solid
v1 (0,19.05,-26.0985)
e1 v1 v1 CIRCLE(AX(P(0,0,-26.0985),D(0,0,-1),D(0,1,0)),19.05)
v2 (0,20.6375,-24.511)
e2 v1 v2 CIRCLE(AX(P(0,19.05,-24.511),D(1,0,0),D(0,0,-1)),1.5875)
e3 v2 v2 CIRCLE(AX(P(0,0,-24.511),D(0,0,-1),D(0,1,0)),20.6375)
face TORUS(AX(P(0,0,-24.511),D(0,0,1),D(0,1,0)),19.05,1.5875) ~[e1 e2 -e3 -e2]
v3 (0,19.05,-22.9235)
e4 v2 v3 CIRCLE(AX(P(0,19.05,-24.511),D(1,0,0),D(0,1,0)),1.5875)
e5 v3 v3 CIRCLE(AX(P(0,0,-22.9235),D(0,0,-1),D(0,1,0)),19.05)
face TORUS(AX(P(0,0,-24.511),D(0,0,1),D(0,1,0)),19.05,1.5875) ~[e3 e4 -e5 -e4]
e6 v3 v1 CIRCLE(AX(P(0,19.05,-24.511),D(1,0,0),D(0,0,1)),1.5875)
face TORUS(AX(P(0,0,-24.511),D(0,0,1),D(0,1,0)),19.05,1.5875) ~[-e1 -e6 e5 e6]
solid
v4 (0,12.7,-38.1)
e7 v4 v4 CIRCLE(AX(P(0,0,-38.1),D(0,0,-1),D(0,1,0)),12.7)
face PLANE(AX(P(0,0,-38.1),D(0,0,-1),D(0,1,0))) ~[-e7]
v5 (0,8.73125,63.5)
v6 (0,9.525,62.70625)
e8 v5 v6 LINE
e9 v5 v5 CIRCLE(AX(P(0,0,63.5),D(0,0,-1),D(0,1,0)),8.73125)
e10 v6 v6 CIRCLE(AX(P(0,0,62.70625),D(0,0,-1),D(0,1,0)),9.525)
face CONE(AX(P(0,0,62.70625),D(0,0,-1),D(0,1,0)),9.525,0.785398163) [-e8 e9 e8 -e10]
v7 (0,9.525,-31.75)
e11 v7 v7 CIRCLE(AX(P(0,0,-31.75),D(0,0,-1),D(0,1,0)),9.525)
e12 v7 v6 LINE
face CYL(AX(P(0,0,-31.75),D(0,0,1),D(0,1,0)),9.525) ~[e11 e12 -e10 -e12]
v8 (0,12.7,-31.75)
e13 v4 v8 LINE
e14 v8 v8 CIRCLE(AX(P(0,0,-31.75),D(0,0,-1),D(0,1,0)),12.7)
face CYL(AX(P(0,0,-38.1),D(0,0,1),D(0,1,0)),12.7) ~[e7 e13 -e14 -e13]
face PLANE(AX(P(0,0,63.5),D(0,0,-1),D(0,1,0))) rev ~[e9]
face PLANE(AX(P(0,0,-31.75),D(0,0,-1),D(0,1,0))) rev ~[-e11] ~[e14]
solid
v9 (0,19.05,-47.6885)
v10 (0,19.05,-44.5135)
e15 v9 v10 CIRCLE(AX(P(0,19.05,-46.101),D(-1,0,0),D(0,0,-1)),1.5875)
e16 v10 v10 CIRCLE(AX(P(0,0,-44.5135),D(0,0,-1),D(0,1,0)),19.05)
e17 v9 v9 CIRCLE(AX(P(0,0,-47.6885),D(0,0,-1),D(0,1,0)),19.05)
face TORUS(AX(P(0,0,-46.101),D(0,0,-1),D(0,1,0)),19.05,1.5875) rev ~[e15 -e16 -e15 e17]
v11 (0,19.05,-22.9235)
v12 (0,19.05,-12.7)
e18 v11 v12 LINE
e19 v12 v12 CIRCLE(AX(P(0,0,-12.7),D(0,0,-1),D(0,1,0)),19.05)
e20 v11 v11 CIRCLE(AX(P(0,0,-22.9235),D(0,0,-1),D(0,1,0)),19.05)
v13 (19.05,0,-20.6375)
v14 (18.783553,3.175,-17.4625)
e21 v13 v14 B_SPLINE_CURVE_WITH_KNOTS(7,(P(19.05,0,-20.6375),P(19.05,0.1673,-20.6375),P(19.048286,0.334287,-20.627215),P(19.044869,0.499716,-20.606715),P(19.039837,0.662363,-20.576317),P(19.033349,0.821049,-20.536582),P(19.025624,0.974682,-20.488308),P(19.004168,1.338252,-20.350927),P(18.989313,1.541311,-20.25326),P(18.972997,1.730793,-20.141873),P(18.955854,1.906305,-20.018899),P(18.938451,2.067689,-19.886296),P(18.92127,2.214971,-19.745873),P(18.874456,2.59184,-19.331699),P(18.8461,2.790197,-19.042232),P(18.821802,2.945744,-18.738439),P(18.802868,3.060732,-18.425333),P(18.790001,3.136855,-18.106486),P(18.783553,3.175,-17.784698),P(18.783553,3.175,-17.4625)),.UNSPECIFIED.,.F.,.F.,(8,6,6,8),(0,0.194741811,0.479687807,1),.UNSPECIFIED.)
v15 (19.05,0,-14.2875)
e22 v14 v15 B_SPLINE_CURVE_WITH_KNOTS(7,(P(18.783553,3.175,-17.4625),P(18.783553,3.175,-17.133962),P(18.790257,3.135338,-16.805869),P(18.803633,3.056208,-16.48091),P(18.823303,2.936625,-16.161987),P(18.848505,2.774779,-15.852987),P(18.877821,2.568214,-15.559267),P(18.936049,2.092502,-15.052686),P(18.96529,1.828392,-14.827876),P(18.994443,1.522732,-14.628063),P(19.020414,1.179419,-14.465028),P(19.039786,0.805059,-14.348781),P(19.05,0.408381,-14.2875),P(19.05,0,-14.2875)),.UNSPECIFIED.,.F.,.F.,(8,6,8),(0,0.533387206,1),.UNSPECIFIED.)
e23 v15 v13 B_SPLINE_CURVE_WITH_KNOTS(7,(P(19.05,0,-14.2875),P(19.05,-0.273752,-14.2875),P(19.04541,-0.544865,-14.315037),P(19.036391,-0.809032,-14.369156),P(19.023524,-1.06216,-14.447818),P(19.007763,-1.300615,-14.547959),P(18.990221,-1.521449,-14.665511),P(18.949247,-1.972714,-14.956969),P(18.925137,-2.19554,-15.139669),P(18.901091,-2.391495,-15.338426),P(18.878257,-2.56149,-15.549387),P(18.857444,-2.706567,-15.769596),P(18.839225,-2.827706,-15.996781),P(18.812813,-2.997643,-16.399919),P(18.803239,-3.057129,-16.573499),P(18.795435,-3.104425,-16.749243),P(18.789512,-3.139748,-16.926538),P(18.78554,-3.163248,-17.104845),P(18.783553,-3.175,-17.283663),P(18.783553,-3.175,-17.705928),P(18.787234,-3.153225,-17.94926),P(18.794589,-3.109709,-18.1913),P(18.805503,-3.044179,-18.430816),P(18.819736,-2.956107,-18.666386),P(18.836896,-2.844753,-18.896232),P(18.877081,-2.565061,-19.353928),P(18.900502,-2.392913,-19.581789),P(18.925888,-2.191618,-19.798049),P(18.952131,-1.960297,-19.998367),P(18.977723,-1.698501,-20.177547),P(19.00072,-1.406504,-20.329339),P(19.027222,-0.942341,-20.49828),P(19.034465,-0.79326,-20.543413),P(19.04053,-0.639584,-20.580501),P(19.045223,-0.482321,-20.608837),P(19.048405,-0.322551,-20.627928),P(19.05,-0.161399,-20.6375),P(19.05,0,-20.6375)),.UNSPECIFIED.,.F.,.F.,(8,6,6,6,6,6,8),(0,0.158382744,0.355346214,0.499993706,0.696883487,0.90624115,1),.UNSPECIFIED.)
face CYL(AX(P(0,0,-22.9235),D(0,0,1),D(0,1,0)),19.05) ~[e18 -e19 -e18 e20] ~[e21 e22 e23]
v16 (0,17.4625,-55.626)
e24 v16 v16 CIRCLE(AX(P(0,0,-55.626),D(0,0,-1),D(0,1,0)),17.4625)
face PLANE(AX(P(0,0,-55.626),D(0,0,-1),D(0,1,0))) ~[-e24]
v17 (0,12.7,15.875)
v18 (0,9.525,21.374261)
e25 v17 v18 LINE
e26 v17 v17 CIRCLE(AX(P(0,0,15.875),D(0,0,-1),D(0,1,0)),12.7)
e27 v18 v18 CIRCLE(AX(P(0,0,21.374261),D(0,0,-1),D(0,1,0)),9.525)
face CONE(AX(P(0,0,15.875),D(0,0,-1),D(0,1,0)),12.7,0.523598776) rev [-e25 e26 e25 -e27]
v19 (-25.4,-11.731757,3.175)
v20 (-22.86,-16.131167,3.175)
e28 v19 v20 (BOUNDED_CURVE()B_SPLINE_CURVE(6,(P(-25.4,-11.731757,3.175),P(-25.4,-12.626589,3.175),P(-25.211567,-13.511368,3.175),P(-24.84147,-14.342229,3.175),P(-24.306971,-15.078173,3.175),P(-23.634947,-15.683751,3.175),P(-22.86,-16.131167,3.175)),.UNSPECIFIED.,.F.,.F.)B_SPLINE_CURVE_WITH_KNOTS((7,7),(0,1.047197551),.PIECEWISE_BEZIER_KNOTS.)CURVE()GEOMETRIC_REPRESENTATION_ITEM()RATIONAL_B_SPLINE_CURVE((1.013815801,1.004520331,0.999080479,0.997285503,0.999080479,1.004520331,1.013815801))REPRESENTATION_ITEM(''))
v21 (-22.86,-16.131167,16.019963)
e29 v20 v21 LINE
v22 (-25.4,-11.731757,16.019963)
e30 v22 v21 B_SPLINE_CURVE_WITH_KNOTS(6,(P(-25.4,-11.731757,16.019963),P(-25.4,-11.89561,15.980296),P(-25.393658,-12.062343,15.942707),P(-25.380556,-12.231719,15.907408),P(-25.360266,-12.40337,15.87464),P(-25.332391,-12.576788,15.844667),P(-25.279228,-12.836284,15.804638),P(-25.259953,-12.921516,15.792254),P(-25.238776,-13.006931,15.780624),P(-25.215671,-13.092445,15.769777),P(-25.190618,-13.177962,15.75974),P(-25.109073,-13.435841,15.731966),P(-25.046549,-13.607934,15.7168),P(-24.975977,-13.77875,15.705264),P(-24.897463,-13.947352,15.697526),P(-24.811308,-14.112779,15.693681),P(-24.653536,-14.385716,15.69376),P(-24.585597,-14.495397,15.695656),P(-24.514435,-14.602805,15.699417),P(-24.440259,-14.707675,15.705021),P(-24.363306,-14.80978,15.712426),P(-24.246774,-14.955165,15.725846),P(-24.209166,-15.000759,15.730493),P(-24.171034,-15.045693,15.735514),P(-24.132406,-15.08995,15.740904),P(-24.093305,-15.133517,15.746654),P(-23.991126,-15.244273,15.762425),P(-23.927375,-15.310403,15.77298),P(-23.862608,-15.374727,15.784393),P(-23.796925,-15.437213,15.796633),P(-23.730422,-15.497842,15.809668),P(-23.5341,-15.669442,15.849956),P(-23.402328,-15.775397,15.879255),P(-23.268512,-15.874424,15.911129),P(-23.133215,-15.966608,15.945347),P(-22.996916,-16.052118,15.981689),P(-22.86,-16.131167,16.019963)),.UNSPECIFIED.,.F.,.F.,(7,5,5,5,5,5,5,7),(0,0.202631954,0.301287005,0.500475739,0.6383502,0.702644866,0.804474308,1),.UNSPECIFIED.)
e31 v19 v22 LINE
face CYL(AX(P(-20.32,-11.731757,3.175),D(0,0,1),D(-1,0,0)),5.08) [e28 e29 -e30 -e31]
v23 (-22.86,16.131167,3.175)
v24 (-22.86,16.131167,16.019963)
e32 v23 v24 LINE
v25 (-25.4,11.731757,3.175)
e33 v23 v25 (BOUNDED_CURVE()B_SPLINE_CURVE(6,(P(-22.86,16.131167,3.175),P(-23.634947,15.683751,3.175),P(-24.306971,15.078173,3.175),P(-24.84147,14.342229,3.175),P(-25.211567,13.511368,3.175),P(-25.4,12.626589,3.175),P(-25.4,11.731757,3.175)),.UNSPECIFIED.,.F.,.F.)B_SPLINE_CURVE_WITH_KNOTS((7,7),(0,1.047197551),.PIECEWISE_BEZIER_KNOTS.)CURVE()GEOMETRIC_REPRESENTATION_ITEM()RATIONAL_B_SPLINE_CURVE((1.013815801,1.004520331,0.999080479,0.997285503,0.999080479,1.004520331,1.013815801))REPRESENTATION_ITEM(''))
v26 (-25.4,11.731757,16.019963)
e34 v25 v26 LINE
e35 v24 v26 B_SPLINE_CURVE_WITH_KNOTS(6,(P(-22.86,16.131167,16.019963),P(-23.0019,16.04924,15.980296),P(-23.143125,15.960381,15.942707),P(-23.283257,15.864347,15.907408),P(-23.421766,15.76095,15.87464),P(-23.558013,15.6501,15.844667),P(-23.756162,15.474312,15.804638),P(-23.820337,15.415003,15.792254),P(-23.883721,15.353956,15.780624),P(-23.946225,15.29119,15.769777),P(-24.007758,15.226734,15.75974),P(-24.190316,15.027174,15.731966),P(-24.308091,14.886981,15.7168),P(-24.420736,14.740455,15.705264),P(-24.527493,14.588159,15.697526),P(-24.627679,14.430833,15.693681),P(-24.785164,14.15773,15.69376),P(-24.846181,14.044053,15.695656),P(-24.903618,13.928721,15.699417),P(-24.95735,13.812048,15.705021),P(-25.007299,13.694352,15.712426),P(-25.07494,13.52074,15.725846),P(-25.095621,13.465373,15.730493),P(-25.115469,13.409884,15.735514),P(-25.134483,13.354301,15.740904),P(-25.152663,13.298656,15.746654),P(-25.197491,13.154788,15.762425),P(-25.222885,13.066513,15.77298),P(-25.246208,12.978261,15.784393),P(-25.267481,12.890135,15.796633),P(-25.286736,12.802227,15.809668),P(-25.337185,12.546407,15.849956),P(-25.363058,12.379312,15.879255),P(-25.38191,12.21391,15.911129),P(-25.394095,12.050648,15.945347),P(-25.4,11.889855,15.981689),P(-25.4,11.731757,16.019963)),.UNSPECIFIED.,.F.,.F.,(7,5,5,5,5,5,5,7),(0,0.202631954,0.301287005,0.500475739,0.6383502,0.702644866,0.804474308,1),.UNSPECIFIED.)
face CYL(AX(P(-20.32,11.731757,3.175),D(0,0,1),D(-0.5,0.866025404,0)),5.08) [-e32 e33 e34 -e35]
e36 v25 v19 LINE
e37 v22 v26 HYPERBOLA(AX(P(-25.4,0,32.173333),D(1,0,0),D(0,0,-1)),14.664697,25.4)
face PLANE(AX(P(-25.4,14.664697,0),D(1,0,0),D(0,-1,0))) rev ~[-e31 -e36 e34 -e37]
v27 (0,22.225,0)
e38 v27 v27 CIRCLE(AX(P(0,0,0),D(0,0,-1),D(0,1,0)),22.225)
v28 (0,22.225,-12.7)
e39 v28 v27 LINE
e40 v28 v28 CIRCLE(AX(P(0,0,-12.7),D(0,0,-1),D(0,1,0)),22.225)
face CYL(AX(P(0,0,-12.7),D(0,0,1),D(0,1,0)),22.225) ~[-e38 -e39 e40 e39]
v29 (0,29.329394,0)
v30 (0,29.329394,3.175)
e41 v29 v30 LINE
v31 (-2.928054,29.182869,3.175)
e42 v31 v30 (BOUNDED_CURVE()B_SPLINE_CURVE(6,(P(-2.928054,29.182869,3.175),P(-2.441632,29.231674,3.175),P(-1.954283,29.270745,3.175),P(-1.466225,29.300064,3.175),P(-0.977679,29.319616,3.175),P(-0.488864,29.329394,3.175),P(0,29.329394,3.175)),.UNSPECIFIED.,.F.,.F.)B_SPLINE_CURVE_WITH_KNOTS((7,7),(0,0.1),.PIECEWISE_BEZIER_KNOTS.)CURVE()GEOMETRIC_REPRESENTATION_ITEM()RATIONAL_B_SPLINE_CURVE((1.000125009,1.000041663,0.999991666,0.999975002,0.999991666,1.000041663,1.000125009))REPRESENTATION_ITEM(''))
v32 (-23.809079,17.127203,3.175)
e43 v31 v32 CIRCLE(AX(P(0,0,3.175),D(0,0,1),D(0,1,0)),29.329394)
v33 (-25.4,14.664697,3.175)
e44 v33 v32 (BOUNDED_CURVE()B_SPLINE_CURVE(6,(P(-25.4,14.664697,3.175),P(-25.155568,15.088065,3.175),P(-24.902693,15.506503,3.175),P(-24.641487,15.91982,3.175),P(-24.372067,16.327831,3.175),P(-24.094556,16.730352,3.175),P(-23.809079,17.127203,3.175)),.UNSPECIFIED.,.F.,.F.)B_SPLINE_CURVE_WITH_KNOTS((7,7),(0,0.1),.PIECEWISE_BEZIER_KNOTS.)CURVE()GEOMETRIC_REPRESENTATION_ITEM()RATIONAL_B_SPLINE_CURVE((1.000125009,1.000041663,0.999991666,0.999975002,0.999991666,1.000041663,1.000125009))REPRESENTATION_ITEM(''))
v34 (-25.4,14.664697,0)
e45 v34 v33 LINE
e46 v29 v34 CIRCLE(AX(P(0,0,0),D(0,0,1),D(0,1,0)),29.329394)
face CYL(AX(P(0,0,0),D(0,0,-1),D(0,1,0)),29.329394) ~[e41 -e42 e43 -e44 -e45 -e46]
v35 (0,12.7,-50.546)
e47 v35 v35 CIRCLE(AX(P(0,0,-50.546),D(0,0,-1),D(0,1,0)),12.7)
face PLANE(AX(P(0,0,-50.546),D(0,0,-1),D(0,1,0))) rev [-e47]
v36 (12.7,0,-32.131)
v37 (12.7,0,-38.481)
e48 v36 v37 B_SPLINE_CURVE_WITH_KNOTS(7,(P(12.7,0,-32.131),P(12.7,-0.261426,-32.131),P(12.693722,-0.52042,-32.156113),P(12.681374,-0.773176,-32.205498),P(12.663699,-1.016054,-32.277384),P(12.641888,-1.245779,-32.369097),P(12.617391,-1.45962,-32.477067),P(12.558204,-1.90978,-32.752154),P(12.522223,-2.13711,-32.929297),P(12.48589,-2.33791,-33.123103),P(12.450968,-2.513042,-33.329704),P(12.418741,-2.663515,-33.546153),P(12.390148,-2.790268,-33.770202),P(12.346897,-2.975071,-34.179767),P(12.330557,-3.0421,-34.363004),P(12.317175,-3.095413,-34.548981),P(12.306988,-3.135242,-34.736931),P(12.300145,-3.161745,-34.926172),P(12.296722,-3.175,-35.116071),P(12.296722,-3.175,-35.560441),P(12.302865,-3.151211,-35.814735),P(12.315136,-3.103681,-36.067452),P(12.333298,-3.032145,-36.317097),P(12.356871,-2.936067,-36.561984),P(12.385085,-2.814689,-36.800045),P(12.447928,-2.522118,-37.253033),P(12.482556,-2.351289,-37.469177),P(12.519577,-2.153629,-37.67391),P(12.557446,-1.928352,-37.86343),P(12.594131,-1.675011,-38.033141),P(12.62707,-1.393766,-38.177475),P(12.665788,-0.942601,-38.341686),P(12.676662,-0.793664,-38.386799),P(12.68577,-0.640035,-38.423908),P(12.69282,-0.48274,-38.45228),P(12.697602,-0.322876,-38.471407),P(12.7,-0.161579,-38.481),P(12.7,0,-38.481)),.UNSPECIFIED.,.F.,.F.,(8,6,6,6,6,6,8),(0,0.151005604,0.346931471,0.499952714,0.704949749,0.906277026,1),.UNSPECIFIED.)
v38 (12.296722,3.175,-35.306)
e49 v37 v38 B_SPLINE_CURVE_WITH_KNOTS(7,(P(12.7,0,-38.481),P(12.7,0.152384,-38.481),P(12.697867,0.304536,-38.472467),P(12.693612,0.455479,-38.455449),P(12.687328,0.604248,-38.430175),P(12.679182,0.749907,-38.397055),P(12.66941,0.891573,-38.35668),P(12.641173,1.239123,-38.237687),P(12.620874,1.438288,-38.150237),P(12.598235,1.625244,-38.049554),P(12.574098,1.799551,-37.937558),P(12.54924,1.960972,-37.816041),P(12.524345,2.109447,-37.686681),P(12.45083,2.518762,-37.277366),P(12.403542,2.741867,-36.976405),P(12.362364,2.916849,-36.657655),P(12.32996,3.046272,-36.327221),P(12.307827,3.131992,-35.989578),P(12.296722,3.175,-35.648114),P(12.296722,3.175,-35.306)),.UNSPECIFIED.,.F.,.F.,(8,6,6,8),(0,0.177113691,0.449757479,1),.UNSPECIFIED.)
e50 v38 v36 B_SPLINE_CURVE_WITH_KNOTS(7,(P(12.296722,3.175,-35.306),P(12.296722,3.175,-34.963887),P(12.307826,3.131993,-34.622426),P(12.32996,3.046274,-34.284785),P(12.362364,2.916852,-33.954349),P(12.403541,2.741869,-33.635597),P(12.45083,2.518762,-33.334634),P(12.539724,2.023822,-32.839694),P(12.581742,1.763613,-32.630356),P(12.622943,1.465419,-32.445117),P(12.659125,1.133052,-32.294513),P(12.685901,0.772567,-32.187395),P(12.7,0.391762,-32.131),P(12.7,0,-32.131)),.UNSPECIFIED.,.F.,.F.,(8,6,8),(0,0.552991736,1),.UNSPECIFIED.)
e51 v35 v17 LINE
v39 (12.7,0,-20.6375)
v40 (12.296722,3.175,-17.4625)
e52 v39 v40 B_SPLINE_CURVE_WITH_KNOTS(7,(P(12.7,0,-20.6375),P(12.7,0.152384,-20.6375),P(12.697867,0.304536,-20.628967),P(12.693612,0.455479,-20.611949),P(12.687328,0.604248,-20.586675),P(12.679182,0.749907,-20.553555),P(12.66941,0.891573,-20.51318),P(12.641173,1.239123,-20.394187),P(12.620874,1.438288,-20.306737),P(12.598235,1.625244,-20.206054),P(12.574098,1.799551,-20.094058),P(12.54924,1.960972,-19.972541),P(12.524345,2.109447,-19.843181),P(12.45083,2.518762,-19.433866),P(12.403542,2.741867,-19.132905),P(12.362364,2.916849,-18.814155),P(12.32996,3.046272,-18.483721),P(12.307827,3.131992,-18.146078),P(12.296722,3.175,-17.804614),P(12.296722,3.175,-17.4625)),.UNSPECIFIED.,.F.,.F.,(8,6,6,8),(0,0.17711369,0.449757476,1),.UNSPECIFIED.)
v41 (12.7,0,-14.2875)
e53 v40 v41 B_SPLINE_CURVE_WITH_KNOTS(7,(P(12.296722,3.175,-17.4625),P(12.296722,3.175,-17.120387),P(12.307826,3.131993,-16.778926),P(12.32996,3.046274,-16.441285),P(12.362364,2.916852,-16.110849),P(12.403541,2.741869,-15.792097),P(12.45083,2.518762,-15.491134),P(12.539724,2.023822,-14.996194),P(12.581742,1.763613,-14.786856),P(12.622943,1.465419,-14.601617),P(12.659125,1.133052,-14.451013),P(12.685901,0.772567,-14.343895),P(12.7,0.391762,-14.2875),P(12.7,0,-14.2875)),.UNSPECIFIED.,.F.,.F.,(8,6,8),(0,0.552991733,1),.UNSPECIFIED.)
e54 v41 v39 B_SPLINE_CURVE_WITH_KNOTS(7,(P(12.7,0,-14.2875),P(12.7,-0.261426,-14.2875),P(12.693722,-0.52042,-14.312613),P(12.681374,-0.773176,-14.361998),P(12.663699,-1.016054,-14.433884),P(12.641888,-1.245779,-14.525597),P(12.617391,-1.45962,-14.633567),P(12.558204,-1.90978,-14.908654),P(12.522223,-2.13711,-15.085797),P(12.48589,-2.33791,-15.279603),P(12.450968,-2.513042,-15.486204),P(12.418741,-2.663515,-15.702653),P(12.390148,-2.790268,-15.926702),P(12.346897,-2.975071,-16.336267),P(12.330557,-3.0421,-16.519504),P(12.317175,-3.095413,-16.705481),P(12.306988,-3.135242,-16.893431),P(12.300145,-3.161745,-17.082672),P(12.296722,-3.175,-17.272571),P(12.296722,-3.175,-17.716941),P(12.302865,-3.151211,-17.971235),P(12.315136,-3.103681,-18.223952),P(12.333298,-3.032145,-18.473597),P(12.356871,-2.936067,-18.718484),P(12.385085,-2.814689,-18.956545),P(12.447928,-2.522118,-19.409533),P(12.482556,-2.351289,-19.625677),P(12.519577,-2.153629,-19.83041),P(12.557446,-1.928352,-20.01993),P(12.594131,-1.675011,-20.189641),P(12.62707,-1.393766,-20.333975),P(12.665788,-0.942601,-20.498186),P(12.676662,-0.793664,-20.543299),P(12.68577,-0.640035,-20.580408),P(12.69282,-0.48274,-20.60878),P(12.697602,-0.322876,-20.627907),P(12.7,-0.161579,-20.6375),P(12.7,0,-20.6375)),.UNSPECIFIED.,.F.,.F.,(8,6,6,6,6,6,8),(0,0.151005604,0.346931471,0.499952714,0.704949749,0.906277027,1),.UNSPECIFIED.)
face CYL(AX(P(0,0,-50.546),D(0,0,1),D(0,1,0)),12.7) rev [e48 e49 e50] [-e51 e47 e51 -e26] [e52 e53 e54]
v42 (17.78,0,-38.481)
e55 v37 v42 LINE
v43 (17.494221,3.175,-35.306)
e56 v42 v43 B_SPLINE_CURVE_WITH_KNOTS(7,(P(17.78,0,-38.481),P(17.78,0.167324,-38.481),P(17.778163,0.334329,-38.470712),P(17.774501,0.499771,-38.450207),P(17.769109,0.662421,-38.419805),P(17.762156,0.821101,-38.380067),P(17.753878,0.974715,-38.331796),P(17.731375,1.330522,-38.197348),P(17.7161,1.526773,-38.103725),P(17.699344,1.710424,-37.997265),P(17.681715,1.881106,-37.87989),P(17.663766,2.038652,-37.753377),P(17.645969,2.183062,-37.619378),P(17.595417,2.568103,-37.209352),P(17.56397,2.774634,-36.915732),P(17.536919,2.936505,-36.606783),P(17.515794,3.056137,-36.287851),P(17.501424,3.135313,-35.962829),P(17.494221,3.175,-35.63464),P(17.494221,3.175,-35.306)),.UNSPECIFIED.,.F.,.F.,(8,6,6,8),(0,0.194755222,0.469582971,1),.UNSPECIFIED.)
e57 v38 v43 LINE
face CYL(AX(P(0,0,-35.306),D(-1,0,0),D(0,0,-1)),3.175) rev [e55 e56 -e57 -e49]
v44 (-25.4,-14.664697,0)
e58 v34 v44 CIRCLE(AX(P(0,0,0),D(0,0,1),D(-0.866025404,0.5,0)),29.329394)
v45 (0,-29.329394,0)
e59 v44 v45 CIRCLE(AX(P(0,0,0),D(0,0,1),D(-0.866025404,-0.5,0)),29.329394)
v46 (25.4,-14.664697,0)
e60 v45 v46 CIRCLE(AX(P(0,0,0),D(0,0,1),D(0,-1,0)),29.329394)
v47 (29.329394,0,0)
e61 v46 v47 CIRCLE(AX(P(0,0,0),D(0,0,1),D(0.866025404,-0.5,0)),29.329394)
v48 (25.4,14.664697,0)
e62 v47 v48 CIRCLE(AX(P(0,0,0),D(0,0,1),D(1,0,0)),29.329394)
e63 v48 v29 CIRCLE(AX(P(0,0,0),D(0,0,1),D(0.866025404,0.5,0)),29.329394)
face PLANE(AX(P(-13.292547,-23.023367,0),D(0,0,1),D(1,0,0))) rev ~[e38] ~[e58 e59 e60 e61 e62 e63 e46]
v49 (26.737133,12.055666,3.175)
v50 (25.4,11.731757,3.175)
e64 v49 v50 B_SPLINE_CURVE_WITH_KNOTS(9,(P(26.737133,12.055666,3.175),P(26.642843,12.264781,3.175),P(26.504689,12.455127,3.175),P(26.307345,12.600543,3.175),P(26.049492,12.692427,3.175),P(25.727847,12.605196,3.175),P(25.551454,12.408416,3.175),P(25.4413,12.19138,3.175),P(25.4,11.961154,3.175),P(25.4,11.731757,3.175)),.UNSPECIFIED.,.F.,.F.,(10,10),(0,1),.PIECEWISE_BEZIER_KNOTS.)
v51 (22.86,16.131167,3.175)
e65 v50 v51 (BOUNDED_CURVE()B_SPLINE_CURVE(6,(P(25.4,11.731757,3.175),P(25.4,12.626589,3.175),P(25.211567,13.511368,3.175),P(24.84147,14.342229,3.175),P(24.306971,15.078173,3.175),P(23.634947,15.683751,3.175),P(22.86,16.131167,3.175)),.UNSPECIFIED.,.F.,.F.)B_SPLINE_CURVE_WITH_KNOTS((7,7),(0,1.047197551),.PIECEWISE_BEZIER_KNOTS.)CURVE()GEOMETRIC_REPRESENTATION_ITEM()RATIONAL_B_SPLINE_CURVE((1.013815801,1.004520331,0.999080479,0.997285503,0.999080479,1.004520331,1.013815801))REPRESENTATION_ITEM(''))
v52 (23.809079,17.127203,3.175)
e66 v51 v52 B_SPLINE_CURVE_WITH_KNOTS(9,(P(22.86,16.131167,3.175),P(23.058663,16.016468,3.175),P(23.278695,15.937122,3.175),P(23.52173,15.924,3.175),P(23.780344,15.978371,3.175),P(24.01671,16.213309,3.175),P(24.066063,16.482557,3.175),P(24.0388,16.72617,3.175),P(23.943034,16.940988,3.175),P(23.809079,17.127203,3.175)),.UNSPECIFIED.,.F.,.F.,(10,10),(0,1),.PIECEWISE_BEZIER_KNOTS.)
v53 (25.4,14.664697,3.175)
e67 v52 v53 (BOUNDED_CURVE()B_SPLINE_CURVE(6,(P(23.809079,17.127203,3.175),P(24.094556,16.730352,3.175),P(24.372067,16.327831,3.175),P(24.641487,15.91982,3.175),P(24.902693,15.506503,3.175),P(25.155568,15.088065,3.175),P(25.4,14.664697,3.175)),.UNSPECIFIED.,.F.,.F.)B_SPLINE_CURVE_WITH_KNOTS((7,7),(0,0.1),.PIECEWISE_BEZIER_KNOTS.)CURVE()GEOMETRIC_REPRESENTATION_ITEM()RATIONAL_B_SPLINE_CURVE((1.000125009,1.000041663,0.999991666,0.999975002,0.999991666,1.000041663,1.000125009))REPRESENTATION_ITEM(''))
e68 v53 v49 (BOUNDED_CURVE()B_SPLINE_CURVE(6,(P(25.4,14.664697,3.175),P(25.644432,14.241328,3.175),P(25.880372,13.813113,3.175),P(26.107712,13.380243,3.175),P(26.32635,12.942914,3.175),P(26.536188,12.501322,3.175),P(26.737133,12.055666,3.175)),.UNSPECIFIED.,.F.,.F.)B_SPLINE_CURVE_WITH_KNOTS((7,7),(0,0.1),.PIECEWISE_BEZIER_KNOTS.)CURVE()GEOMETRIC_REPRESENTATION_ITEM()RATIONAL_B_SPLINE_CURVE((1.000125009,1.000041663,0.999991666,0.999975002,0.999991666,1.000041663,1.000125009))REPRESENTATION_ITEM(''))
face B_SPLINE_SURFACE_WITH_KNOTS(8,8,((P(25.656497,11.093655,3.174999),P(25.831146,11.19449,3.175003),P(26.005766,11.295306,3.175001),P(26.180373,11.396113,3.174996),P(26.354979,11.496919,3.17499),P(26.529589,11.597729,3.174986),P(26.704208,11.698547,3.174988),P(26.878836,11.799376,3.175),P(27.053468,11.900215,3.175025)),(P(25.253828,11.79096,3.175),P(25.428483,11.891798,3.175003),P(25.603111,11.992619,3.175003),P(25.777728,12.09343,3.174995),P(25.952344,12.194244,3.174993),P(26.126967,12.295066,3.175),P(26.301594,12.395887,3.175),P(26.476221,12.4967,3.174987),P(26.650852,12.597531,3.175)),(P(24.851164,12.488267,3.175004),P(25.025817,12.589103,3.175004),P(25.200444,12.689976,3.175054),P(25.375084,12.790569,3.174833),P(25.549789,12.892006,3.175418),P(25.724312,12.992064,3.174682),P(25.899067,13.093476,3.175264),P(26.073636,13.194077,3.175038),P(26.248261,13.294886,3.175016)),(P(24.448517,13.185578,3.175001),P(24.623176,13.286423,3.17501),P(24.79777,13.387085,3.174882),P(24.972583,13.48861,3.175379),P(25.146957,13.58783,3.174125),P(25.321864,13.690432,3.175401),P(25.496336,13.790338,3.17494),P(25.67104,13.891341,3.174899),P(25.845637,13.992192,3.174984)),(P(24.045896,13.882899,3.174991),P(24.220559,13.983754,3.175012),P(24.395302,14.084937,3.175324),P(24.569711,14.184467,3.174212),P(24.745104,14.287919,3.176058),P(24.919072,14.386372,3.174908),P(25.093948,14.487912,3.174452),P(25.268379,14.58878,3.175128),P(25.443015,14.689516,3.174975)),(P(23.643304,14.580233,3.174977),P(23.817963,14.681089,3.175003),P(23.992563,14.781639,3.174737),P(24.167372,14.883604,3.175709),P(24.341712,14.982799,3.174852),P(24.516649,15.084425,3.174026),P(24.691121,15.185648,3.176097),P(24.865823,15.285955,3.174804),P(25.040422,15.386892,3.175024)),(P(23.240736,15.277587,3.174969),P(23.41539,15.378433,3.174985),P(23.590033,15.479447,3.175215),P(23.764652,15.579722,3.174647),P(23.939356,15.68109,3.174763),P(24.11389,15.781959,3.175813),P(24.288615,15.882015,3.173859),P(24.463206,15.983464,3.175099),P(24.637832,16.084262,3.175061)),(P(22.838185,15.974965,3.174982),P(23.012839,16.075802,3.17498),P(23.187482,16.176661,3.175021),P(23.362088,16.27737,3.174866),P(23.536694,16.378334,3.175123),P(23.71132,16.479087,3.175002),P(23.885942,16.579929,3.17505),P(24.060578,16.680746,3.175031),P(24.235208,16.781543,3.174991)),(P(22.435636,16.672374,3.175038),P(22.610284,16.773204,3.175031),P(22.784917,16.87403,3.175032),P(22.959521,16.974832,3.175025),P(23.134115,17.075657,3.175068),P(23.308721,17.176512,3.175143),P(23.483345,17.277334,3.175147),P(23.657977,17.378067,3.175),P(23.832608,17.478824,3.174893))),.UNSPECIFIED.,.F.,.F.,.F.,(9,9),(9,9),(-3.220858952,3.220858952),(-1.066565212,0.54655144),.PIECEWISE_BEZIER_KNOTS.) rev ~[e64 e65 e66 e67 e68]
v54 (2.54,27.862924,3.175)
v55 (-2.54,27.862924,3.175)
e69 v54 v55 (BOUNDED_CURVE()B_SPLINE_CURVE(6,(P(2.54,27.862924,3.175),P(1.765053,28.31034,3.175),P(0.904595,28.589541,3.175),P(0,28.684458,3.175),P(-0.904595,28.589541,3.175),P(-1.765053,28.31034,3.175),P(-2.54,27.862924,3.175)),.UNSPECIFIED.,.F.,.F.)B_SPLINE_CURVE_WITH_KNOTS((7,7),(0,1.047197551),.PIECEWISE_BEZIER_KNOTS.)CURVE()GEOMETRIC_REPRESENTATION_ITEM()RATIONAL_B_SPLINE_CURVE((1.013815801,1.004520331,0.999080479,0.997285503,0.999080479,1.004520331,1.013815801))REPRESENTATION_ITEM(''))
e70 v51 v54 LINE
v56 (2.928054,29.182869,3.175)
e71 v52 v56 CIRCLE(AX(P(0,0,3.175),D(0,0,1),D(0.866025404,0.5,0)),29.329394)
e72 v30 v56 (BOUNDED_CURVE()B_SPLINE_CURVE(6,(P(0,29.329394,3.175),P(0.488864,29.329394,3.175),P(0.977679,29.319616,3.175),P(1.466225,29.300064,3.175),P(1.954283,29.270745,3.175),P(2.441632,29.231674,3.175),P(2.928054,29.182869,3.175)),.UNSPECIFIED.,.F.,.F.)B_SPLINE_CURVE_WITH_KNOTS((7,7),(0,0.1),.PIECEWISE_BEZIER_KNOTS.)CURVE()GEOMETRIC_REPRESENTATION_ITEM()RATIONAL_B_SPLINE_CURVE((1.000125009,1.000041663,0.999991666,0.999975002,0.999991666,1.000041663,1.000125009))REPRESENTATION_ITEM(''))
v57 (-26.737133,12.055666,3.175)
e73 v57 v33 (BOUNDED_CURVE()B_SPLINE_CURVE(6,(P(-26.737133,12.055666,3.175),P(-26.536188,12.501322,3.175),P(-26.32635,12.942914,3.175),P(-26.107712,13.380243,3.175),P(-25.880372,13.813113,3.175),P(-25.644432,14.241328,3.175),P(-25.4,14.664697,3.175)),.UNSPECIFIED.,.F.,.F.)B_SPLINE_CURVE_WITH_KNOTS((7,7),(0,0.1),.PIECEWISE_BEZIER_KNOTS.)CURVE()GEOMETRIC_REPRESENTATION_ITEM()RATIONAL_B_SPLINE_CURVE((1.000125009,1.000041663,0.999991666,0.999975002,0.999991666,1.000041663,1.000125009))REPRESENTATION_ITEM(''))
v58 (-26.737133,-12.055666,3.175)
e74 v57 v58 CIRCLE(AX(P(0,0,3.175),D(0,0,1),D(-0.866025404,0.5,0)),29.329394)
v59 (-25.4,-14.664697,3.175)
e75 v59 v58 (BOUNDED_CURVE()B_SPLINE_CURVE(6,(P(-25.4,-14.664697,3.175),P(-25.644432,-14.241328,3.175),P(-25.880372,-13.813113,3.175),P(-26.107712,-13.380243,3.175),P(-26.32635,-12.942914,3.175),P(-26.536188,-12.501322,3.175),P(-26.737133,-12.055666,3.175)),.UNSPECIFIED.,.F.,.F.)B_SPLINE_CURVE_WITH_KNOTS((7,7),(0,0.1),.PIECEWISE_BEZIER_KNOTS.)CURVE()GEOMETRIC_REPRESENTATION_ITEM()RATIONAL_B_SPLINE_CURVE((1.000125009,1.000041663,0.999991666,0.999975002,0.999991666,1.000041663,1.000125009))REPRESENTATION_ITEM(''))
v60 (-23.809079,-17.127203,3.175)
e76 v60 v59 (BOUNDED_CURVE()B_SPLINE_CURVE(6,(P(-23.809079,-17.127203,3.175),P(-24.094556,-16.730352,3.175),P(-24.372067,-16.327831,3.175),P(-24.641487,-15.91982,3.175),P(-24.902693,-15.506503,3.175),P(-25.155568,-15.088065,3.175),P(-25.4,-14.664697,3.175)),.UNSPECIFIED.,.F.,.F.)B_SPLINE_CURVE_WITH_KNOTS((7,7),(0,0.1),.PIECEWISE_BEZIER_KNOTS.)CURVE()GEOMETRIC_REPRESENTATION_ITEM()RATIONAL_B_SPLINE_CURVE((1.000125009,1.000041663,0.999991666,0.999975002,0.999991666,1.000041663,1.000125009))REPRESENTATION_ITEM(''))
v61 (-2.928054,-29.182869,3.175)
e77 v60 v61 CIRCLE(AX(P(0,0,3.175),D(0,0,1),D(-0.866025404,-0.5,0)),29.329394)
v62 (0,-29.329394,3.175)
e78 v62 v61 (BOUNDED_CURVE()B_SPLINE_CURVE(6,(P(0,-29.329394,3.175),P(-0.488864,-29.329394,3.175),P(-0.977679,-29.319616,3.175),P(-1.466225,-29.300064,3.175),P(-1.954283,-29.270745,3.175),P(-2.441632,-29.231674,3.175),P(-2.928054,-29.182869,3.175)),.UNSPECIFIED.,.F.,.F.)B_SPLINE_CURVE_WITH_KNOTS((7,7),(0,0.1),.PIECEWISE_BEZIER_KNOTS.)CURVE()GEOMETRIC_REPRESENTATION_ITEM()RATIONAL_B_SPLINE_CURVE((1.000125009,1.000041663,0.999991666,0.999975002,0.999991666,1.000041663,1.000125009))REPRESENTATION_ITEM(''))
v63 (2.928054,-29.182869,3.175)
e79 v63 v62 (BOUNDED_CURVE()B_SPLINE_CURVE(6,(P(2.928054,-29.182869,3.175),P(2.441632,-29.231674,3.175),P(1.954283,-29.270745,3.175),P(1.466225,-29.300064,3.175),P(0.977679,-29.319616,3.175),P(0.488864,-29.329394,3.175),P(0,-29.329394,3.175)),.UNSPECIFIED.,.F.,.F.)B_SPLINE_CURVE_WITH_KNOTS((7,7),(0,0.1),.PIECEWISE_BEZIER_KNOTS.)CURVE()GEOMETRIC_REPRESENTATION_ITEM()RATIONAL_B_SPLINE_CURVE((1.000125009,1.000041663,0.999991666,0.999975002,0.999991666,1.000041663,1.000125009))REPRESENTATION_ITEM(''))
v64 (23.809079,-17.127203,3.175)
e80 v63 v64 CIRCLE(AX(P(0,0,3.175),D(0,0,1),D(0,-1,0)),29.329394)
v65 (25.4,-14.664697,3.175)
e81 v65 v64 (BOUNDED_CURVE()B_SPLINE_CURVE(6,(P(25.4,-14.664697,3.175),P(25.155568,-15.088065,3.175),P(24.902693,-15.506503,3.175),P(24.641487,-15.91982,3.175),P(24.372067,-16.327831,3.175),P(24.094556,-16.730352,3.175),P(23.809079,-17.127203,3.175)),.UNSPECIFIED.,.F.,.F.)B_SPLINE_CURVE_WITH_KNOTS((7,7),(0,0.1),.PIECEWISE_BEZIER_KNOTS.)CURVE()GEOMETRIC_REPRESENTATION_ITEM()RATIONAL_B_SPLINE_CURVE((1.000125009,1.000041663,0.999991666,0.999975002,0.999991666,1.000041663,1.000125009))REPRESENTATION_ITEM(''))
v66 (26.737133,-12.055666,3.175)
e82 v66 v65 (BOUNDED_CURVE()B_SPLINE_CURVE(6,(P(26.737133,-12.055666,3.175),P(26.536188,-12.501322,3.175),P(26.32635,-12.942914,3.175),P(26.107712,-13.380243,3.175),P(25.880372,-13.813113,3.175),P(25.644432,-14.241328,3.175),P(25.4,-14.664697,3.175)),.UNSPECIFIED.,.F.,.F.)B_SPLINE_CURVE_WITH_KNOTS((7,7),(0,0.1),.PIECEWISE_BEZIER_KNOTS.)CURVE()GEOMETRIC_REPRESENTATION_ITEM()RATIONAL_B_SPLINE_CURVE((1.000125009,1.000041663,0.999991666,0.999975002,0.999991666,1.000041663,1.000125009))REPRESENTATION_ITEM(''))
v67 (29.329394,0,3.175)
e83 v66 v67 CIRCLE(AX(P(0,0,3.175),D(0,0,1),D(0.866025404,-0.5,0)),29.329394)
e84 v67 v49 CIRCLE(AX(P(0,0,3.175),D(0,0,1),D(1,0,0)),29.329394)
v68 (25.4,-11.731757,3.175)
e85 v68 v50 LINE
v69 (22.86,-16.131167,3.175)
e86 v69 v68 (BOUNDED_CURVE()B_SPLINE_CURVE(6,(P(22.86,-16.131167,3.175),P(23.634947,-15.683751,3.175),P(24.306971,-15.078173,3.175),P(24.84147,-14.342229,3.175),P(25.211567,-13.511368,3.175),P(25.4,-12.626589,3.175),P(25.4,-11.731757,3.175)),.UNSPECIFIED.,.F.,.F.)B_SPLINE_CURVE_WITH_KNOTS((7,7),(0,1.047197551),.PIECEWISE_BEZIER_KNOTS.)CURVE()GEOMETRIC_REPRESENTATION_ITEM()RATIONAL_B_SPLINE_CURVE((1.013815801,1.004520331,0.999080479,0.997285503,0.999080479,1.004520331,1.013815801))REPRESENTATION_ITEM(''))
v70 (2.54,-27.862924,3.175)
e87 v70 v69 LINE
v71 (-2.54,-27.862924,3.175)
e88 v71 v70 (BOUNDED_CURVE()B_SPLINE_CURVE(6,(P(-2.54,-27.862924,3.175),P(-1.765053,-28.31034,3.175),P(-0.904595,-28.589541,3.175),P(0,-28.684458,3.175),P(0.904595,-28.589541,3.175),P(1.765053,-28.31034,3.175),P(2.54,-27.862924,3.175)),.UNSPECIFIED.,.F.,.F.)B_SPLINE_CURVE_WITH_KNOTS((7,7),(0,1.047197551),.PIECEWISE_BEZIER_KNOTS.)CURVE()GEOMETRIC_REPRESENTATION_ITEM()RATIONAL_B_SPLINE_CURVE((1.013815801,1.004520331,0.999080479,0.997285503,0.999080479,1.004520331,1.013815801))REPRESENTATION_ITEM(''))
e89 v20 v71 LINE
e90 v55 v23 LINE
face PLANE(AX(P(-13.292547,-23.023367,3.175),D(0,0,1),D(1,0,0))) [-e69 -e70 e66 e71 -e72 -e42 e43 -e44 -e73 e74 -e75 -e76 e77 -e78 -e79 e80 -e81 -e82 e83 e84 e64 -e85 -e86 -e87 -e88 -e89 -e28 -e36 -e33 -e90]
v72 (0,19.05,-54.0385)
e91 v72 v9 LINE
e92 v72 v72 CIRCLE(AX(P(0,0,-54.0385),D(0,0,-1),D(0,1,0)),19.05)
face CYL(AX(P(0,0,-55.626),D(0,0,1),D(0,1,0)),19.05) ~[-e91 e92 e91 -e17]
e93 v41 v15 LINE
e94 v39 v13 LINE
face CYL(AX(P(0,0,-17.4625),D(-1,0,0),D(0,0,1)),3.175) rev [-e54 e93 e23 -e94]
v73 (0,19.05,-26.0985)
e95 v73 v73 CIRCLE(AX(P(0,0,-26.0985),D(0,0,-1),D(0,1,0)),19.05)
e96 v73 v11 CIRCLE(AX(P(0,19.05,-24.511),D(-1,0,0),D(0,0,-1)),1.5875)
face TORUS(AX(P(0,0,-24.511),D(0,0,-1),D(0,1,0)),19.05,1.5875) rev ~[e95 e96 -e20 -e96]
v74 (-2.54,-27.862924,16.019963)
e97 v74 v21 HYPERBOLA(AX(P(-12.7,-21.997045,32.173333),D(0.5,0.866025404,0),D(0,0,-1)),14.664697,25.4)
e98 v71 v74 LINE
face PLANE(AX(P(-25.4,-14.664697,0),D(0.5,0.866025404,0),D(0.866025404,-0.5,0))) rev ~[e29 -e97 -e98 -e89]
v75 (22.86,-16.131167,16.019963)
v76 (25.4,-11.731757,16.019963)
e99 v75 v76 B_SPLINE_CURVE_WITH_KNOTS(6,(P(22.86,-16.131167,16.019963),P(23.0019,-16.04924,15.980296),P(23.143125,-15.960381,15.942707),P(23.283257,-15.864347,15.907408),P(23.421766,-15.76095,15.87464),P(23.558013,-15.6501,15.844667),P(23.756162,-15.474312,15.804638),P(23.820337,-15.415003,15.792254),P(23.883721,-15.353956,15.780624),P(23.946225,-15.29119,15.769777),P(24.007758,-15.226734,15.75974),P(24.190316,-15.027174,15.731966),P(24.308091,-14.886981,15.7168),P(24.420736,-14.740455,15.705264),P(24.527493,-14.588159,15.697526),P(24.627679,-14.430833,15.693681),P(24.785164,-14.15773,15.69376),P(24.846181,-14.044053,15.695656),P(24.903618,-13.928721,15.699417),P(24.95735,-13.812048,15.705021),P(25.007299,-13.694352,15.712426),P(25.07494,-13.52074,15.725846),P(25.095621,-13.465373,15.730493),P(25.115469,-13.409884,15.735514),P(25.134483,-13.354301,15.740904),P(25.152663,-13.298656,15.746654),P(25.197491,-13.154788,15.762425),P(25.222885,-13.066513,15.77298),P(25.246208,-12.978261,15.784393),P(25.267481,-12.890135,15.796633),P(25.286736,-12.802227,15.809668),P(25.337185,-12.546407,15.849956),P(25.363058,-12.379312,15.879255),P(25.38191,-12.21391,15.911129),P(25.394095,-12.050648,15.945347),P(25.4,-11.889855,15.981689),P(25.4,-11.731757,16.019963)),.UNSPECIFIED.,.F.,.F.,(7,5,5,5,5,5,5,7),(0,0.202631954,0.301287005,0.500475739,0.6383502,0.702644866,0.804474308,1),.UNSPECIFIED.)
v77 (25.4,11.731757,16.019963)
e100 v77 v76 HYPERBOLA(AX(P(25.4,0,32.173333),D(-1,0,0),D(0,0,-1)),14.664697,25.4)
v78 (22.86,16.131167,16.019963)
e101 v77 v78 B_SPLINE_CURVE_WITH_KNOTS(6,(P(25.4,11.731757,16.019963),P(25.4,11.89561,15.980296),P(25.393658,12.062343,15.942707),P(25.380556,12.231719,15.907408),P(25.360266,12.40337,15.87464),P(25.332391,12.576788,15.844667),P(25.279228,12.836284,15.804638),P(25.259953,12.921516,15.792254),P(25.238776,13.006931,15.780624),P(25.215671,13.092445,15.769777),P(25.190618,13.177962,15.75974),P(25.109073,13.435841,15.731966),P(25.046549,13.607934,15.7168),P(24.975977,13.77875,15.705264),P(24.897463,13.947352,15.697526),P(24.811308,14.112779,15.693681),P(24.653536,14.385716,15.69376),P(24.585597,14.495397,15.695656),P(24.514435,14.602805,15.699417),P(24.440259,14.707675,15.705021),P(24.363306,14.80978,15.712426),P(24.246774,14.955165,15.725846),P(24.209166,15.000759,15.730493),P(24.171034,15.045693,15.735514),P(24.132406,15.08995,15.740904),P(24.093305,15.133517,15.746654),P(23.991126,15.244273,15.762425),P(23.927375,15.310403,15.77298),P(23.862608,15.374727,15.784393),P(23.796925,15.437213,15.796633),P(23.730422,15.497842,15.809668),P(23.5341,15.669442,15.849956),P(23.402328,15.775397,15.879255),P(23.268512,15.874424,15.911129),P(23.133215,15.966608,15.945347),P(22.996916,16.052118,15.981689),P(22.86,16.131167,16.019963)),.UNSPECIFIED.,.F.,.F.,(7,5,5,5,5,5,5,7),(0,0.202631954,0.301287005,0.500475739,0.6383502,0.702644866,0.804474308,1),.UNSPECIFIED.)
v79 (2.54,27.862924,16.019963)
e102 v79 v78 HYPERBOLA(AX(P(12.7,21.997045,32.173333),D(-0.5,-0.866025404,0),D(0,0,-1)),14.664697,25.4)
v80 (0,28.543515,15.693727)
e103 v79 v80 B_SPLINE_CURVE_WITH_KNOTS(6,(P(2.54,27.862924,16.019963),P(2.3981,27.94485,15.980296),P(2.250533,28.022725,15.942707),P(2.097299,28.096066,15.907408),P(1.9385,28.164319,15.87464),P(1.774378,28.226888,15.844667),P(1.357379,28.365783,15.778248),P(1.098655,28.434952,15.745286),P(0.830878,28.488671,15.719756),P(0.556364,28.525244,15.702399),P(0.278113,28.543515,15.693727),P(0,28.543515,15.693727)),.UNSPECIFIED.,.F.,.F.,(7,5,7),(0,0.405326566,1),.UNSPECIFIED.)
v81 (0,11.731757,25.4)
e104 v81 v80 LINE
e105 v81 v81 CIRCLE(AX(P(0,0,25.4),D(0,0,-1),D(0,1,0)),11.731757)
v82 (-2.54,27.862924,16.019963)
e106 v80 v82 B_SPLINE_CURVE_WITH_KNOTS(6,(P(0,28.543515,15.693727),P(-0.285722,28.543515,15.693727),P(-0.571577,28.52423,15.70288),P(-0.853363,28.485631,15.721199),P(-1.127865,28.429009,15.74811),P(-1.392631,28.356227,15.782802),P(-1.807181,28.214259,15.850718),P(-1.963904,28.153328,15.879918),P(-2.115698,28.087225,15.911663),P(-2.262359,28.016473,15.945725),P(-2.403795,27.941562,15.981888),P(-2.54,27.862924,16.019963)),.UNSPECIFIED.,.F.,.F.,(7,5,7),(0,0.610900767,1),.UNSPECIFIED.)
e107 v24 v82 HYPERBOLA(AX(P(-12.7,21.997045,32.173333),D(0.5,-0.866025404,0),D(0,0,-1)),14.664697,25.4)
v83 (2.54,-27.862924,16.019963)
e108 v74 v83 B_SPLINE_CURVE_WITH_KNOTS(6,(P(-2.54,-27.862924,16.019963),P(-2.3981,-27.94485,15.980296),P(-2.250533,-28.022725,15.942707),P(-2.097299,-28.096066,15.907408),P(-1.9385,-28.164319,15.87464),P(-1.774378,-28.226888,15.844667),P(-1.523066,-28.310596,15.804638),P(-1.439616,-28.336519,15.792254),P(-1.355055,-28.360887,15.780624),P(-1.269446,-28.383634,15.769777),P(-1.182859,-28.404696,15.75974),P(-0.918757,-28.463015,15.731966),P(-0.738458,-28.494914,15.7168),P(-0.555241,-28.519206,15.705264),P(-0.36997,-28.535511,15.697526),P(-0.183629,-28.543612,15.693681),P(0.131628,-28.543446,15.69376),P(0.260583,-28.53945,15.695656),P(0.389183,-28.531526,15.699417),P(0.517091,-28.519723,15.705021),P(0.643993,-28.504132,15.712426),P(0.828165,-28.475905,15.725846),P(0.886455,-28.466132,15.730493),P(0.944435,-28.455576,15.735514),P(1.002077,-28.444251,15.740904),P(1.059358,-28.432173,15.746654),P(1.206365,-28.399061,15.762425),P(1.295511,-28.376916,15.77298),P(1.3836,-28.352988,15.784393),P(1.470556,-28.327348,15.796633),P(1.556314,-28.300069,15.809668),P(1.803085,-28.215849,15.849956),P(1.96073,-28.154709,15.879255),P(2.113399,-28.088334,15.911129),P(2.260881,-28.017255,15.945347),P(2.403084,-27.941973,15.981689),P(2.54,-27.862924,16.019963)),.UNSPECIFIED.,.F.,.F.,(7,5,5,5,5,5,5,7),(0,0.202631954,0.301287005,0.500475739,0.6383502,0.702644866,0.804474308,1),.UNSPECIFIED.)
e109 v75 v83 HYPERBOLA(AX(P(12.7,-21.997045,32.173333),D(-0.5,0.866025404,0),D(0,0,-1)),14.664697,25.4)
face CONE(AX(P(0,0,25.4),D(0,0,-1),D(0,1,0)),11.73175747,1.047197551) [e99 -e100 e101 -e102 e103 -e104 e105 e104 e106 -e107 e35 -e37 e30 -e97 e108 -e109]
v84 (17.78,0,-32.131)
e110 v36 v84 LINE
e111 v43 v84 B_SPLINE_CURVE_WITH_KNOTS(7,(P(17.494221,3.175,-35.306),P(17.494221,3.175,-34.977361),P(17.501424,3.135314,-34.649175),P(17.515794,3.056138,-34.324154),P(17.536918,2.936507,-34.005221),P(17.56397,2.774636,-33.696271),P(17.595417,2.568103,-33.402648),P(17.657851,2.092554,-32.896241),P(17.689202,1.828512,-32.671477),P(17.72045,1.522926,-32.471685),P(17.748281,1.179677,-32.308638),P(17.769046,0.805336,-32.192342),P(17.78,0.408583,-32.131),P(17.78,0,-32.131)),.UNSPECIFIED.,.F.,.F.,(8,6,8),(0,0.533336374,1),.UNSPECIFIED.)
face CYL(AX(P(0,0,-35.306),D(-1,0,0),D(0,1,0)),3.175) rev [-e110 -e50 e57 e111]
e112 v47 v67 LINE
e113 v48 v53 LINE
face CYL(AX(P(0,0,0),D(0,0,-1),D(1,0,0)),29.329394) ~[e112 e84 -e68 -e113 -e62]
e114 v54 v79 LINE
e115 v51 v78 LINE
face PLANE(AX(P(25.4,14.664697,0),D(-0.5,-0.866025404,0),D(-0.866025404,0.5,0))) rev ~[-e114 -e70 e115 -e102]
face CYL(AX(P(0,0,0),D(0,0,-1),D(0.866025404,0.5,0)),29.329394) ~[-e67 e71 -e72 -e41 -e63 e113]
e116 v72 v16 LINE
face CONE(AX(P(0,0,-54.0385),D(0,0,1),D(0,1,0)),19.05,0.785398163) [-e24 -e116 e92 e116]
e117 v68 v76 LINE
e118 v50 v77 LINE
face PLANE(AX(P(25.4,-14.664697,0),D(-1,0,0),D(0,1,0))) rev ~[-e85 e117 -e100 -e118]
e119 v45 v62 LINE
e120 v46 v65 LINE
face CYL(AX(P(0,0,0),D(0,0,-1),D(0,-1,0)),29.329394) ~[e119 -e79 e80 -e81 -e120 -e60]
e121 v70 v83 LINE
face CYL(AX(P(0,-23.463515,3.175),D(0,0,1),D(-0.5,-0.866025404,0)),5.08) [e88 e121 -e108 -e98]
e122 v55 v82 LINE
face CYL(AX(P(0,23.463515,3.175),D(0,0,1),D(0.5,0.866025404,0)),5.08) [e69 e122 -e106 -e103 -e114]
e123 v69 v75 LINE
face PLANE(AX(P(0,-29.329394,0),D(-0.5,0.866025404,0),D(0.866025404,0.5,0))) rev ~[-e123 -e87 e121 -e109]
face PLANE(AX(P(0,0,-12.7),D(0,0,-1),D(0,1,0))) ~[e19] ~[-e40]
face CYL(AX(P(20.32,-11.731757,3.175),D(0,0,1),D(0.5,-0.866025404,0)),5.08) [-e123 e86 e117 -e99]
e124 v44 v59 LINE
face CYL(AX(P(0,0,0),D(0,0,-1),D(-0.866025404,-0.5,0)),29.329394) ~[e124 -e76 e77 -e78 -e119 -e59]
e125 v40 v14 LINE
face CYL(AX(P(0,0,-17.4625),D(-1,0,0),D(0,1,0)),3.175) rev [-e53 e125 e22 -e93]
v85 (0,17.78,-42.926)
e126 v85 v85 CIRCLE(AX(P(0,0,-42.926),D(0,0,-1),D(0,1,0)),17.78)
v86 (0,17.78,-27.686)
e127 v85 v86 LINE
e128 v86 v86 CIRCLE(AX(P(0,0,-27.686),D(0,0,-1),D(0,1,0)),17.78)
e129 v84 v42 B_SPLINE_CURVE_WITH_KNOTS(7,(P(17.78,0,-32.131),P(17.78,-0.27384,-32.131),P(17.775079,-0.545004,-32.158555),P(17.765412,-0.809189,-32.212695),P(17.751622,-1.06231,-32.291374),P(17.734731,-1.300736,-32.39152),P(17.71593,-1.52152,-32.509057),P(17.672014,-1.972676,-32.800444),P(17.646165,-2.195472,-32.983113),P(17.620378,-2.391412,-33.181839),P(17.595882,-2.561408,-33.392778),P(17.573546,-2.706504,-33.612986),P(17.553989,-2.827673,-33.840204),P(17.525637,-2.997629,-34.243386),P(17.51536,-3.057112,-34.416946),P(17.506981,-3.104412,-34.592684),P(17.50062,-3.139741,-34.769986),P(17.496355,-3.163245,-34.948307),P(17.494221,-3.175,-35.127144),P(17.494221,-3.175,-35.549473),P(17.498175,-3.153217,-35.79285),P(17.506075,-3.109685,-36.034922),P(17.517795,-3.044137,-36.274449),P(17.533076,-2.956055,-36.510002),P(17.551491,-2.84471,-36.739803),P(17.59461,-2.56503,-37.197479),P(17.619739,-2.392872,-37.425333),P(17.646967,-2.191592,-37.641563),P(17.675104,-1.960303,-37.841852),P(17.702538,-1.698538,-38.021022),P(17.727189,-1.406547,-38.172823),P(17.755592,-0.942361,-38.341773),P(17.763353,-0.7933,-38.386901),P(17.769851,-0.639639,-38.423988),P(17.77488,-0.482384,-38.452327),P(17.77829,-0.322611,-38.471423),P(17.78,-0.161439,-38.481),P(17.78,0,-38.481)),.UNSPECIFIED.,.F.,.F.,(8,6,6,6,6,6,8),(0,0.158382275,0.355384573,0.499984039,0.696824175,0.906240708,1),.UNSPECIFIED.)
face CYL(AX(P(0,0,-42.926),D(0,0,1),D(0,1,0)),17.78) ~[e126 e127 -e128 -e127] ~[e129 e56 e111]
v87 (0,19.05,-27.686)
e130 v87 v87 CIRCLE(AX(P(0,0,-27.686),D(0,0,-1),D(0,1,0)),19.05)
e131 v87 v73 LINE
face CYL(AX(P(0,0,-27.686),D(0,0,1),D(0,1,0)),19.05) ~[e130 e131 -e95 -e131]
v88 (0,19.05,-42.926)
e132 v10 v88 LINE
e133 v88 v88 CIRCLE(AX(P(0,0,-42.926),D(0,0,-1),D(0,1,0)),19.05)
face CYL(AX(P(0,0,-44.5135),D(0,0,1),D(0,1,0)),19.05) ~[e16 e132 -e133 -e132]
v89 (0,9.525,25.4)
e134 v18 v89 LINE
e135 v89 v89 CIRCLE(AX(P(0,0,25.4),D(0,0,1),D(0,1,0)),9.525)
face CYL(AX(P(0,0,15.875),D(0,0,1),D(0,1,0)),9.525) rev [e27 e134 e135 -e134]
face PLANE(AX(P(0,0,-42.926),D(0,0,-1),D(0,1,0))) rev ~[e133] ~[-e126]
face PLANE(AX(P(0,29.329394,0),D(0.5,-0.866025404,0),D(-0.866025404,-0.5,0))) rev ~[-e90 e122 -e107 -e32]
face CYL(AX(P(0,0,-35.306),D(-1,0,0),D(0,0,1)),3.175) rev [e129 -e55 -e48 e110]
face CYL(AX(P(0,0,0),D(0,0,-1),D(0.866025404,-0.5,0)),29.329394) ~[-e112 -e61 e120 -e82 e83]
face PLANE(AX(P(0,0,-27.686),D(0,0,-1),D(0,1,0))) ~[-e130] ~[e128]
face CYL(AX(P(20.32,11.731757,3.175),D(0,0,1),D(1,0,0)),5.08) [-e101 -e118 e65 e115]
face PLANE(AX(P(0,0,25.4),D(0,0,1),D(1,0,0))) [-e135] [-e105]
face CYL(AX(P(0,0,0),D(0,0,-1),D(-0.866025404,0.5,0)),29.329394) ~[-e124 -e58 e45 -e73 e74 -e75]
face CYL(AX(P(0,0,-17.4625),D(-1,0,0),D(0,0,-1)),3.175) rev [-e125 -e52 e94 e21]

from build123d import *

# Parameters (mm, degrees)
F0_R     = 7.9375
F1_DEPTH = 25.4
F2_DEPTH = 3.175
F3_R     = 5.08
F7_SIZE  = 1.5875
F9_DEPTH = 29.3303937748
F10_W    = 9.525
F10_H    = 47.625
F10_W_2  = 3.175
F10_W_3  = 12.7
F10_H_2  = 12.446
F13_SIZE = 0.79375


with BuildPart() as f1:
    # F0 (on Top) → F1 (new body)
    with BuildSketch(Plane.XY):
        Polygon((25.4, -14.6646968374), (25.4, 14.6646968374), (0, 29.3293936748), (-25.4, 14.6646968374), (-25.4, -14.6646968374), (0, -29.3293936748), align=None)
        Circle(F0_R, mode=Mode.SUBTRACT)
        Circle(F0_R)
    extrude(amount=F1_DEPTH)

    # F0 (on Top) → F2 (join)
    with BuildSketch(Plane.XY):
        with BuildLine():
            ThreePointArc((-25.4, -14.6646968374), (-14.6646968374, -25.4), (0, -29.3293936748))
            Line((0, -29.3293936748), (-25.4, -14.6646968374))
        make_face()
        with BuildLine():
            ThreePointArc((0, -29.3293936748), (14.6646968374, -25.4), (25.4, -14.6646968374))
            Line((25.4, -14.6646968374), (0, -29.3293936748))
        make_face()
        with BuildLine():
            ThreePointArc((25.4, -14.6646968374), (28.3300188199, -7.5910056644), (29.3293936748, 0))
            ThreePointArc((29.3293936748, 0), (28.3300188199, 7.5910056644), (25.4, 14.6646968374))
            Line((25.4, 14.6646968374), (25.4, -14.6646968374))
        make_face()
        Polygon((25.4, -14.6646968374), (25.4, 14.6646968374), (0, 29.3293936748), (-25.4, 14.6646968374), (-25.4, -14.6646968374), (0, -29.3293936748), align=None)
        Circle(F0_R, mode=Mode.SUBTRACT)
        with BuildLine():
            Line((0, 29.3293936748), (25.4, 14.6646968374))
            ThreePointArc((25.4, 14.6646968374), (14.6646968374, 25.4), (0, 29.3293936748))
        make_face()
        with BuildLine():
            Line((-25.4, 14.6646968374), (0, 29.3293936748))
            ThreePointArc((0, 29.3293936748), (-14.6646968374, 25.4), (-25.4, 14.6646968374))
        make_face()
        with BuildLine():
            Line((-25.4, -14.6646968374), (-25.4, 14.6646968374))
            ThreePointArc((-25.4, 14.6646968374), (-29.3293936748, 0), (-25.4, -14.6646968374))
        make_face()
    extrude(amount=F2_DEPTH)

    # F3 (call 1 of 6: OpenCascade refuses the feature's edges together)
    f3_edges = [f1.edges().sort_by_distance(p)[0] for p in [
        (0, -29.329394, 14.2875),
    ]]
    fillet(f3_edges, radius=F3_R)

    # F3#2 (call 2 of 6)
    f3_2_edges = [f1.edges().sort_by_distance(p)[0] for p in [
        (25.4, -14.664697, 14.2875),
    ]]
    fillet(f3_2_edges, radius=F3_R)

    # F3#3 (call 3 of 6)
    f3_3_edges = [f1.edges().sort_by_distance(p)[0] for p in [
        (25.4, 14.664697, 14.2875),
    ]]
    fillet(f3_3_edges, radius=F3_R)

    # F3#4 (call 4 of 6)
    f3_4_edges = [f1.edges().sort_by_distance(p)[0] for p in [
        (0, 29.329394, 14.2875),
    ]]
    fillet(f3_4_edges, radius=F3_R)

    # F3#5 (call 5 of 6)
    f3_5_edges = [f1.edges().sort_by_distance(p)[0] for p in [
        (-25.4, 14.664697, 14.2875),
    ]]
    fillet(f3_5_edges, radius=F3_R)

    # F3#6 (call 6 of 6)
    f3_6_edges = [f1.edges().sort_by_distance(p)[0] for p in [
        (-25.4, -14.664697, 14.2875),
    ]]
    fillet(f3_6_edges, radius=F3_R)

    # F4 (on Right) → F5 (revolve, cut)
    with BuildSketch(Plane.YZ):
        Polygon((35.3962906179, 25.4), (11.7317574699, 25.4), (35.3962906179, 11.7372754168), align=None)
    revolve(axis=Axis((0, 0, 25.9955581278), (0, 0, -1)), mode=Mode.SUBTRACT)

    # F4 (on Right) → F6 (revolve)
    with BuildSketch(Plane.YZ):
        with BuildLine():
            Line((17.78, -27.686), (0, -27.686))
            Line((0, -27.686), (0, -32.131))
            ThreePointArc((0, -32.131), (2.2450640303, -33.0609359697), (3.175, -35.306))
            ThreePointArc((3.175, -35.306), (2.2450640303, -37.5510640303), (0, -38.481))
            Line((0, -38.481), (0, -42.926))
            Line((0, -42.926), (17.78, -42.926))
            Line((17.78, -42.926), (17.78, -27.686))
        make_face()
        with BuildLine():
            Line((19.05, -12.7), (0, -12.7))
            Line((0, -12.7), (0, -14.2875))
            ThreePointArc((0, -14.2875), (2.2450640303, -15.2174359697), (3.175, -17.4625))
            ThreePointArc((3.175, -17.4625), (2.2450640303, -19.7075640303), (0, -20.6375))
            Line((0, -20.6375), (0, -27.686))
            Line((0, -27.686), (17.78, -27.686))
            Line((17.78, -27.686), (19.05, -27.686))
            Line((19.05, -27.686), (19.05, -26.0985))
            ThreePointArc((19.05, -26.0985), (17.4625, -24.511), (19.05, -22.9235))
            Line((19.05, -22.9235), (19.05, -12.7))
        make_face()
        Polygon((22.225, 0), (0, 0), (0, -12.7), (19.05, -12.7), (22.225, -12.7), align=None)
        with BuildLine():
            Line((19.05, -42.926), (17.78, -42.926))
            Line((17.78, -42.926), (0, -42.926))
            Line((0, -42.926), (0, -55.626))
            Line((0, -55.626), (19.05, -55.626))
            Line((19.05, -55.626), (19.05, -47.6885))
            ThreePointArc((19.05, -47.6885), (17.4625, -46.101), (19.05, -44.5135))
            Line((19.05, -44.5135), (19.05, -42.926))
        make_face()
    revolve(axis=Axis((0, 0, 25.9955581278), (0, 0, -1)))

    # F7
    f7_edges = [f1.edges().sort_by_distance(p)[0] for p in [
        (0, -19.05, -55.626),
    ]]
    chamfer(f7_edges, length=F7_SIZE)


with BuildPart() as f8:
    # F4 (on Right) → F8 (revolve)
    with BuildSketch(Plane.YZ):
        with BuildLine():
            Line((0, -20.6375), (0, -14.2875))
            ThreePointArc((0, -14.2875), (-3.175, -17.4625), (0, -20.6375))
        make_face()
    revolve(axis=Axis((0, 0, 25.9955581278), (0, 0, -1)))


with BuildPart() as f8b:
    # F4 (on Right) → F8, piece 2 (revolve)
    with BuildSketch(Plane.YZ):
        with BuildLine():
            ThreePointArc((20.6375, -24.511), (20.1725320151, -23.3884679849), (19.05, -22.9235))
            Line((19.05, -22.9235), (19.05, -26.0985))
            ThreePointArc((19.05, -26.0985), (20.1725320151, -25.6335320151), (20.6375, -24.511))
        make_face()
        with BuildLine():
            Line((19.05, -26.0985), (19.05, -22.9235))
            ThreePointArc((19.05, -22.9235), (17.4625, -24.511), (19.05, -26.0985))
        make_face()
    revolve(axis=Axis((0, 0, 25.9955581278), (0, 0, -1)))


with BuildPart() as f9_tool:
    # F4 (on Right) → F9 (new body, through all)
    with BuildSketch(Plane.YZ):
        with BuildLine():
            Line((0, -20.6375), (0, -14.2875))
            ThreePointArc((0, -14.2875), (-3.175, -17.4625), (0, -20.6375))
        make_face()
        with BuildLine():
            ThreePointArc((3.175, -17.4625), (2.2450640303, -15.2174359697), (0, -14.2875))
            Line((0, -14.2875), (0, -20.6375))
            ThreePointArc((0, -20.6375), (2.2450640303, -19.7075640303), (3.175, -17.4625))
        make_face()
        with BuildLine():
            Line((0, -38.481), (0, -32.131))
            ThreePointArc((0, -32.131), (-3.175, -35.306), (0, -38.481))
        make_face()
        with BuildLine():
            ThreePointArc((3.175, -35.306), (2.2450640303, -33.0609359697), (0, -32.131))
            Line((0, -32.131), (0, -38.481))
            ThreePointArc((0, -38.481), (2.2450640303, -37.5510640303), (3.175, -35.306))
        make_face()
    extrude(amount=F9_DEPTH)


with BuildPart() as f1_1:
    add(f1.part)

    # F9: cut by f9_tool
    add(f9_tool.part, mode=Mode.SUBTRACT)


with BuildPart() as f8_1:
    add(f8.part)

    # F9: cut by f9_tool
    add(f9_tool.part, mode=Mode.SUBTRACT)


with BuildPart() as f11_tool:
    # F10 (on Right) → F11 (revolve)
    with BuildSketch(Plane.YZ):
        Polygon((9.525, 63.5), (0, 63.5), (0, 15.875), (9.525, 15.875), (9.525, 21.374261314), align=None)
        Polygon((9.525, 21.374261314), (9.525, 15.875), (12.7, 15.875), align=None)
        with Locations((4.7625, -7.9375)):
            Rectangle(F10_W, F10_H)
        with Locations((11.1125, -7.9375)):
            Rectangle(F10_W_2, F10_H)
        with Locations((6.35, -44.323)):
            Rectangle(F10_W_3, F10_H_2)
        Polygon((9.525, -31.75), (0, -31.75), (0, -38.1), (12.7, -38.1), (12.7, -31.75), align=None)
    revolve(axis=Axis((0, 0, 6.477), (0, 0, -1)))


with BuildPart() as f1_2:
    add(f1_1.part)

    # F11: cut by f11_tool
    add(f11_tool.part, mode=Mode.SUBTRACT)


with BuildPart() as f8_2:
    add(f8_1.part)

    # F11: cut by f11_tool
    add(f11_tool.part, mode=Mode.SUBTRACT)


with BuildPart() as f12:
    # F10 (on Right) → F12 (revolve)
    with BuildSketch(Plane.YZ):
        Polygon((9.525, 63.5), (0, 63.5), (0, 15.875), (9.525, 15.875), (9.525, 21.374261314), align=None)
        with Locations((4.7625, -7.9375)):
            Rectangle(F10_W, F10_H)
        Polygon((9.525, -31.75), (0, -31.75), (0, -38.1), (12.7, -38.1), (12.7, -31.75), align=None)
    revolve(axis=Axis((0, 0, 6.477), (0, 0, -1)))

    # F13
    f13_edges = [f12.edges().sort_by_distance(p)[0] for p in [
        (0, -9.525, 63.5),
    ]]
    chamfer(f13_edges, length=F13_SIZE)


solid = Compound([f8b.part, f1_2.part, f12.part])
